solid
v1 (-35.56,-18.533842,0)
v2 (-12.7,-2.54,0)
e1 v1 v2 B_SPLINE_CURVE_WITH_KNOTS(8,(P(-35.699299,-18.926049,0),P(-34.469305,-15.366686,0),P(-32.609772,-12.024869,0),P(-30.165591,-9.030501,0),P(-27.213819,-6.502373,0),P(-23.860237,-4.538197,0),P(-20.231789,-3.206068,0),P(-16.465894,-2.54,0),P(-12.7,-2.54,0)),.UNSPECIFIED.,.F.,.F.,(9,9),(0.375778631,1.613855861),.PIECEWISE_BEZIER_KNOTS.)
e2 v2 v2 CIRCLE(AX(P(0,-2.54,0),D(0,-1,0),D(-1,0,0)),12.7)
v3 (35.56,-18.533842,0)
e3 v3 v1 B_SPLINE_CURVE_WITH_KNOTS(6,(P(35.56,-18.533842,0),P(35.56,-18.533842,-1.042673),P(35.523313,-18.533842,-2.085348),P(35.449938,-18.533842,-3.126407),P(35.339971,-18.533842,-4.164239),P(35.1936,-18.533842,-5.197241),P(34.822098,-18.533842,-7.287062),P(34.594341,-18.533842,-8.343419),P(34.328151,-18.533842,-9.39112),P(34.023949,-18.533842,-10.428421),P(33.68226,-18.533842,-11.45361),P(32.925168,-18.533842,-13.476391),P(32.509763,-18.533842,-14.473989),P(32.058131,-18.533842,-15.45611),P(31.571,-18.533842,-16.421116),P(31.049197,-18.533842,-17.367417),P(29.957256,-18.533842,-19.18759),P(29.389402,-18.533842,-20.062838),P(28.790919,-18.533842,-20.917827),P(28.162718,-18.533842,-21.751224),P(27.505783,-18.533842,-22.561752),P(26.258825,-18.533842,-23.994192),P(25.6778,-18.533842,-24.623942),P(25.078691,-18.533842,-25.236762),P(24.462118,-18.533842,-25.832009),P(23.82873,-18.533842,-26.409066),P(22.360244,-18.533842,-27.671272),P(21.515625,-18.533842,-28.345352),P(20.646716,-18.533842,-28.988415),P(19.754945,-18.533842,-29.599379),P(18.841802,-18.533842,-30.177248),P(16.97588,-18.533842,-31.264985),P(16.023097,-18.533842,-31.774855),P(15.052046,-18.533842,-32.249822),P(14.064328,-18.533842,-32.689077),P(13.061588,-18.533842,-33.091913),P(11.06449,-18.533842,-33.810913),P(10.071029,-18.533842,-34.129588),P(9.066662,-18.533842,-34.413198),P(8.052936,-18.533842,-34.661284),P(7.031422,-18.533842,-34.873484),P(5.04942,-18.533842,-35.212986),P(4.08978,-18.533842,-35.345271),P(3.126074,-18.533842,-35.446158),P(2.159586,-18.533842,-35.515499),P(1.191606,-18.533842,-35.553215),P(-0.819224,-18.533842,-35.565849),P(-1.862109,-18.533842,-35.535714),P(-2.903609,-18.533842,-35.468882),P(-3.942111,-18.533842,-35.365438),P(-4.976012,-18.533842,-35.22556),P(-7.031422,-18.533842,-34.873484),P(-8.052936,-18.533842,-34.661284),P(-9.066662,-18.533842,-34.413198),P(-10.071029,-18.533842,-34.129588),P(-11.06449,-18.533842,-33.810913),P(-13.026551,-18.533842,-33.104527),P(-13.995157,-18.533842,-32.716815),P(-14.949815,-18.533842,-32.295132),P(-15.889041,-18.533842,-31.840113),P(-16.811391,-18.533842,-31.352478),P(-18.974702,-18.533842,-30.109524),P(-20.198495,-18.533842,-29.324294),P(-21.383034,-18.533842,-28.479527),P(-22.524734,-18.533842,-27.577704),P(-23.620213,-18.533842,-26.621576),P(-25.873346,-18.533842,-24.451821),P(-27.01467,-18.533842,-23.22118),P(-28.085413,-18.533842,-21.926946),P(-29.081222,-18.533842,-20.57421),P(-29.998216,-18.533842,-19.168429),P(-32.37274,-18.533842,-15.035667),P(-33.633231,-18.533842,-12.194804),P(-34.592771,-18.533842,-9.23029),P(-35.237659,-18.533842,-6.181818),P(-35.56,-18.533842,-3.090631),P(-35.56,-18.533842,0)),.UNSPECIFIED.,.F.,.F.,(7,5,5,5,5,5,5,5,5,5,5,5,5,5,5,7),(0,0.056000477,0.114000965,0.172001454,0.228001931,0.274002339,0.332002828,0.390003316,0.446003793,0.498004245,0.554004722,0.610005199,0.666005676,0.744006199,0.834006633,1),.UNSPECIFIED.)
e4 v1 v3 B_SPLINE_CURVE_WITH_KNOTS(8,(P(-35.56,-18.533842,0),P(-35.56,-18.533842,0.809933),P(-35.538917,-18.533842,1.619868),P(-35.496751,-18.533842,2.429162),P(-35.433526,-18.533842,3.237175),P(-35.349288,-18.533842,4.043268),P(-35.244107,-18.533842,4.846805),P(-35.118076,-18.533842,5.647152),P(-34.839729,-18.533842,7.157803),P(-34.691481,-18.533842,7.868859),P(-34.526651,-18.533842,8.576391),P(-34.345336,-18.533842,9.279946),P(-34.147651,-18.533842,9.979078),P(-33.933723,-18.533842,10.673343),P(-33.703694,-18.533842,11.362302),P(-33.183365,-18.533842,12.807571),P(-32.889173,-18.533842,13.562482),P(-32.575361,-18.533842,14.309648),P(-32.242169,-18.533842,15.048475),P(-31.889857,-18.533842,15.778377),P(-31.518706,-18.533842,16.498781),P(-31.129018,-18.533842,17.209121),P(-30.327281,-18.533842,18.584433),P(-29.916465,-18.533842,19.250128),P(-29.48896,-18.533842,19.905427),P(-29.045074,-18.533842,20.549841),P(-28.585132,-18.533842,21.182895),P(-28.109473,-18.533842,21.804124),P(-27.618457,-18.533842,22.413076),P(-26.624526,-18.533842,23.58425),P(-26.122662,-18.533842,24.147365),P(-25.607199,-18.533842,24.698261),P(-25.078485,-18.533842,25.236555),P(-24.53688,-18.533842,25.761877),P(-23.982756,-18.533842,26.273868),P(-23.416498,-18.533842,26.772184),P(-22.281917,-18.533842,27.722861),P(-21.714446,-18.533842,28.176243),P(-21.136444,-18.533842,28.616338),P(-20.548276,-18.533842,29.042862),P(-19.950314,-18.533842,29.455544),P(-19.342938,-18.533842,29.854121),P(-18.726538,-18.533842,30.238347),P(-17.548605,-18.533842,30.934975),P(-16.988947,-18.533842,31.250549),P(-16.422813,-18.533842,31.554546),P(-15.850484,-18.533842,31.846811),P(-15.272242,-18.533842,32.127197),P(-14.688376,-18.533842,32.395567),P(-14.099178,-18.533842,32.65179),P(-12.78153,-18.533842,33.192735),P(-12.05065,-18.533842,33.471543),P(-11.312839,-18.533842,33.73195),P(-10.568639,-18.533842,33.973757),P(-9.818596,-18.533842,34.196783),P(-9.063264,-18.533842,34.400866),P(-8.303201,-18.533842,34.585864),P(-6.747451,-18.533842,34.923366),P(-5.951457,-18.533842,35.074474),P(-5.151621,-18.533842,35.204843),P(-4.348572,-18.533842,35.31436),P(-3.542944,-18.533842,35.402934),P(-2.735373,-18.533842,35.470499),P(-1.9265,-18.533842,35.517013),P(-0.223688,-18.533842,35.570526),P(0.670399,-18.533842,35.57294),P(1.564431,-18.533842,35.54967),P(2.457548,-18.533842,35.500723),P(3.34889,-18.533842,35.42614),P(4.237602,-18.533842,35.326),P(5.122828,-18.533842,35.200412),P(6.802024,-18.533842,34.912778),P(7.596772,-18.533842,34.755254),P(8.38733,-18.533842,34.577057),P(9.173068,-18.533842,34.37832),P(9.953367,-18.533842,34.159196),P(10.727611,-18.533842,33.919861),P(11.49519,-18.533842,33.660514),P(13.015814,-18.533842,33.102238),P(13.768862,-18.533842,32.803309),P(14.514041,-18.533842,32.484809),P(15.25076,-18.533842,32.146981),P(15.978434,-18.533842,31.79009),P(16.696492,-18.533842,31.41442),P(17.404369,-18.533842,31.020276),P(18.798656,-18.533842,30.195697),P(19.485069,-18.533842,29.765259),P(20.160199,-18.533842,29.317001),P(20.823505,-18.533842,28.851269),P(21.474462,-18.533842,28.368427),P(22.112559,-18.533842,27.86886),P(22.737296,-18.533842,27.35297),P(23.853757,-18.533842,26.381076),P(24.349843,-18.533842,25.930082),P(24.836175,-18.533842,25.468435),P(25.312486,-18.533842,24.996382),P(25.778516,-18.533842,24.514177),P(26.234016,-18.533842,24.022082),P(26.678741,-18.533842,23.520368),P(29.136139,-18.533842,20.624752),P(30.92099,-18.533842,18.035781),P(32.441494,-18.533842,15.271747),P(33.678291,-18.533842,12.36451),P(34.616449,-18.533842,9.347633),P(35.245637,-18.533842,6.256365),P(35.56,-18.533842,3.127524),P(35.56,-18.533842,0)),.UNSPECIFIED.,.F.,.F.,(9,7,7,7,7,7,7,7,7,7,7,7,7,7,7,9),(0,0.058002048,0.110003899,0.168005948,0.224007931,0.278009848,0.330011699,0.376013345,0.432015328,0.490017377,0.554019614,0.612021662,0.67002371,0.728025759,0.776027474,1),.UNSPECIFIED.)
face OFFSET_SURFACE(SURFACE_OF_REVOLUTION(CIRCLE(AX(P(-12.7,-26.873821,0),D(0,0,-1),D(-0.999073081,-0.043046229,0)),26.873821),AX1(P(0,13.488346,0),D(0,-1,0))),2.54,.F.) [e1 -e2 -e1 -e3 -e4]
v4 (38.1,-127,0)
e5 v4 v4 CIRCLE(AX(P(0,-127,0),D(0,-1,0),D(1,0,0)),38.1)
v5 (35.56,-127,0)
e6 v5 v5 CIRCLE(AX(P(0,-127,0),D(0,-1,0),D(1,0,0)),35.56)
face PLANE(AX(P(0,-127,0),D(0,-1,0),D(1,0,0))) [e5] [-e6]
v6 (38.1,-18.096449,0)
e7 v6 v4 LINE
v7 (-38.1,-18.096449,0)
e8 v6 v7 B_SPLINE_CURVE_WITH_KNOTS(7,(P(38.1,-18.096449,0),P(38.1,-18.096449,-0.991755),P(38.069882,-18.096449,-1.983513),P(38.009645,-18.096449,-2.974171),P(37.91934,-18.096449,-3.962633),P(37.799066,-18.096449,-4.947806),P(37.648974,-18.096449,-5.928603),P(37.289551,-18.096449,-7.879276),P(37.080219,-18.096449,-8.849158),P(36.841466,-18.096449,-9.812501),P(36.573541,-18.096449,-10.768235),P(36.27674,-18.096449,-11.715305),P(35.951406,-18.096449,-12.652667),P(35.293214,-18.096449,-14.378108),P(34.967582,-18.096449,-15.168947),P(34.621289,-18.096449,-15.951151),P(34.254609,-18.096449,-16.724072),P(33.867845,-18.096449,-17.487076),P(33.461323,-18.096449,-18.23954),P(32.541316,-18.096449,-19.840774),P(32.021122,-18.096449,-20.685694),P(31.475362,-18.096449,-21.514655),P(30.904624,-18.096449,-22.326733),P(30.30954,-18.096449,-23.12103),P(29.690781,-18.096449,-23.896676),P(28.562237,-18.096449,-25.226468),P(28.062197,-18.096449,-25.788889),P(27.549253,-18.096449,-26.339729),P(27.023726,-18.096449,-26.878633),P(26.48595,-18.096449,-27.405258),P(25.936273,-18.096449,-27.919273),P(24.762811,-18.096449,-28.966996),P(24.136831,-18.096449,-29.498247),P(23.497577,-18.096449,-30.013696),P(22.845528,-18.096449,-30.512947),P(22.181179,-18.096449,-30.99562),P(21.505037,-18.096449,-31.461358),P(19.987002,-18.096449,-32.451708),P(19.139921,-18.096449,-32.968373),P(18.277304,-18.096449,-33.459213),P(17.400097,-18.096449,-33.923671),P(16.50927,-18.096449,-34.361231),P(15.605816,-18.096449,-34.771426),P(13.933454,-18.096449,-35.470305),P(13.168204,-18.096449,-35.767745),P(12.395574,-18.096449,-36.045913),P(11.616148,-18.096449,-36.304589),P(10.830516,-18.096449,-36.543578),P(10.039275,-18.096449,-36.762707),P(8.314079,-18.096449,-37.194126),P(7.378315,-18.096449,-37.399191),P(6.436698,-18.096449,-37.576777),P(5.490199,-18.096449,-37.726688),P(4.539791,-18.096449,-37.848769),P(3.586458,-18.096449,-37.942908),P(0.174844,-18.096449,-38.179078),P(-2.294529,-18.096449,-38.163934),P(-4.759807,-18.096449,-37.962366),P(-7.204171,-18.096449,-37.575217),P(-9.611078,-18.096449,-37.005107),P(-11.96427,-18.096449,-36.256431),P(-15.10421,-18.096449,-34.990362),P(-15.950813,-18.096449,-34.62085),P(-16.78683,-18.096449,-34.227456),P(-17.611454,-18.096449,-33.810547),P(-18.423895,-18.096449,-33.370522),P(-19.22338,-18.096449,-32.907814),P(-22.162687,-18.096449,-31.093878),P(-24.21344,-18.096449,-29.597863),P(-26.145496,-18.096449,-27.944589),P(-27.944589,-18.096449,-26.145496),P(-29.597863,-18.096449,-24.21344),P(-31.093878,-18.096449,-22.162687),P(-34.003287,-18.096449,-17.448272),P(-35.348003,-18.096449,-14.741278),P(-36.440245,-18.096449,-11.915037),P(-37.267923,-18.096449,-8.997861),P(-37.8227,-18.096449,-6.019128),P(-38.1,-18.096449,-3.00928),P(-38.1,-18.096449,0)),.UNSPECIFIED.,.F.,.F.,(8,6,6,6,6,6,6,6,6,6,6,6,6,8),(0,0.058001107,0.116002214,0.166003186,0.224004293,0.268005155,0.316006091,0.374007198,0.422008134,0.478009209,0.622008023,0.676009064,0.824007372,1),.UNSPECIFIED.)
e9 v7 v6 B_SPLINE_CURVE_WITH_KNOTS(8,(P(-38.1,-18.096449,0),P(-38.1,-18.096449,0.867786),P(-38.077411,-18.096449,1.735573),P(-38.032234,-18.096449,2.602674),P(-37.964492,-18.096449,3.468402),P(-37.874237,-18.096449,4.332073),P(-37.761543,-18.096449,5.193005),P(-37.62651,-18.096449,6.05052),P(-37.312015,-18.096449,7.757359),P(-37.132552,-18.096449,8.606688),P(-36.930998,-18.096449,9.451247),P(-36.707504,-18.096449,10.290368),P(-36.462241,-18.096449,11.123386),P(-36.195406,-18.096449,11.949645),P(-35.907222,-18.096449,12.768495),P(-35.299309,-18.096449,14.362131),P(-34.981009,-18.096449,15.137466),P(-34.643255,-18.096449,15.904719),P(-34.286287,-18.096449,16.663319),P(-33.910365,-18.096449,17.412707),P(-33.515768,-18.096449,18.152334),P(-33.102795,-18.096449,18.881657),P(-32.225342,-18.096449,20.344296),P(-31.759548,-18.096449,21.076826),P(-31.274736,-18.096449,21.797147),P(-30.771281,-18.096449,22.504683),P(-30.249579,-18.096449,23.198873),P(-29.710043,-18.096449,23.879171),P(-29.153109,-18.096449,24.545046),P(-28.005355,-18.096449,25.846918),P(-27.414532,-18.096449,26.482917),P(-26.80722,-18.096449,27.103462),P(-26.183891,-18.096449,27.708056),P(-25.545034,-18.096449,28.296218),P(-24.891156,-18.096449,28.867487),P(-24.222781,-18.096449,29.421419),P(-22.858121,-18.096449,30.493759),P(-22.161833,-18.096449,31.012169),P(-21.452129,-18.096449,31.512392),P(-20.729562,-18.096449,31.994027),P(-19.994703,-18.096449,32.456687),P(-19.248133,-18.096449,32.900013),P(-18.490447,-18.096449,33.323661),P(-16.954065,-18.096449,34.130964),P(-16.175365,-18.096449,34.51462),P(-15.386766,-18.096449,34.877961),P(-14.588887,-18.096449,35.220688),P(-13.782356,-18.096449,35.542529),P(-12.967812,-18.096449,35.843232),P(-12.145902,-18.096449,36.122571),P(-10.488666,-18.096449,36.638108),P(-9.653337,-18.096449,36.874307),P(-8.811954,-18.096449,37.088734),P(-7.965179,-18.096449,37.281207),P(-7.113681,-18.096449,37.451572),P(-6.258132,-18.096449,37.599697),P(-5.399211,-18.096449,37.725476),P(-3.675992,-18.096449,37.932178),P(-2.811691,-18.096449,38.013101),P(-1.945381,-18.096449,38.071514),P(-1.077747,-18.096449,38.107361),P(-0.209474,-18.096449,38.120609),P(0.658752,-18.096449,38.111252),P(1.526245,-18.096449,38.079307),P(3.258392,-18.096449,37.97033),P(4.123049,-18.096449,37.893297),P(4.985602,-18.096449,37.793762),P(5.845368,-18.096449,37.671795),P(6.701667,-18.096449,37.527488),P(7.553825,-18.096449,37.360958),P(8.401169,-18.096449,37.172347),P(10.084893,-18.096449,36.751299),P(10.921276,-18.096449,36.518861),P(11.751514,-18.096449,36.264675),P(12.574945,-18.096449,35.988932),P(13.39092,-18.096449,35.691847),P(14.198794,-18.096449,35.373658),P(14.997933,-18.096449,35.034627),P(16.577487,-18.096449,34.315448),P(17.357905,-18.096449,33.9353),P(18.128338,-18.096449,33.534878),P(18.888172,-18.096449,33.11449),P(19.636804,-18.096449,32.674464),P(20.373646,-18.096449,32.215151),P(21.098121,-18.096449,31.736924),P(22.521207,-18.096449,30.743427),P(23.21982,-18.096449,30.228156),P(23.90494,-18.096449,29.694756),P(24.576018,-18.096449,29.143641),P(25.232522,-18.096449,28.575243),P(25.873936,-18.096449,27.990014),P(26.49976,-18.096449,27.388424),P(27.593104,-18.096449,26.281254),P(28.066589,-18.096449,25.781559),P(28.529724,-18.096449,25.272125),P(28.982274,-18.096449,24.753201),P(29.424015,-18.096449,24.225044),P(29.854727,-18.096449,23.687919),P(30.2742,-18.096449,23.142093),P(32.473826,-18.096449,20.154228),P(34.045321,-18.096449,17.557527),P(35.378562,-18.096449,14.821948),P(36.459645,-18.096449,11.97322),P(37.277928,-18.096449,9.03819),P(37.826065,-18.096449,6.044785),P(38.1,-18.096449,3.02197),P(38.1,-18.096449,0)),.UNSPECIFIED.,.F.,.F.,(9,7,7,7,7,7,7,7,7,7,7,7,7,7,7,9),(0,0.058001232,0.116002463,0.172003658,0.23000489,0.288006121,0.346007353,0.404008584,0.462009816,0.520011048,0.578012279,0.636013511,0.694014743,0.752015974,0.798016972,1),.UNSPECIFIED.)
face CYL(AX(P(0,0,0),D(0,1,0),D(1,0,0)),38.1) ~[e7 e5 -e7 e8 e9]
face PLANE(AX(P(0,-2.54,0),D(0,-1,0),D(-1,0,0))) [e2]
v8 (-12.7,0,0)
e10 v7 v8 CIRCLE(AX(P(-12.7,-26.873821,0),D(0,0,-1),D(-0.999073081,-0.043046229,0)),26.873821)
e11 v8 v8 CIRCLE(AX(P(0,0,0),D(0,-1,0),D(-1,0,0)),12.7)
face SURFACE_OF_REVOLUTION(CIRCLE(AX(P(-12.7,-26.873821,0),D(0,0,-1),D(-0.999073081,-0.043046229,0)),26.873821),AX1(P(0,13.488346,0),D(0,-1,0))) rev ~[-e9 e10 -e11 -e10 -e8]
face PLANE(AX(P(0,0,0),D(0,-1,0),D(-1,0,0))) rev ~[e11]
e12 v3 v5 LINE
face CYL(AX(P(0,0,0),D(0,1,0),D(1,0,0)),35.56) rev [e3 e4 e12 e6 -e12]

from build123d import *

# Parameters (mm, degrees)
F0_R     = 38.1
F1_DEPTH = 127
F6_T     = -2.54


# Not quite as in the source:
# - a feature of the source that left no trace in its solid (it failed there, or was rolled back) is left out


with BuildPart() as f1:
    # F0 (on Front) → F1 (new body)
    with BuildSketch(Plane.XZ):
        Circle(F0_R)
    extrude(amount=F1_DEPTH)

    # F2 (on Top) → F3 (revolve, cut)
    with BuildSketch(Plane.XY):
        with BuildLine():
            Line((-12.7, 0), (0, 0))
            Line((0, 0), (0, 26.976691559))
            Line((0, 26.976691559), (-68.359054625, 26.976691559))
            Line((-68.359054625, 26.976691559), (-68.359054625, -28.0306376517))
            Line((-68.359054625, -28.0306376517), (-39.5489111543, -28.0306376517))
            ThreePointArc((-39.5489111543, -28.0306376517), (-32.1073483334, -8.2846551837), (-12.7, 0))
        make_face()
    revolve(axis=Axis((0, 13.4883457795, 0), (0, -1, 0)), mode=Mode.SUBTRACT)

    # F6
    f6_openings = [f1.faces().sort_by_distance(p)[0] for p in [
        (0, -127, 0),
    ]]
    offset(amount=F6_T, openings=f6_openings)


solid = f1.part
